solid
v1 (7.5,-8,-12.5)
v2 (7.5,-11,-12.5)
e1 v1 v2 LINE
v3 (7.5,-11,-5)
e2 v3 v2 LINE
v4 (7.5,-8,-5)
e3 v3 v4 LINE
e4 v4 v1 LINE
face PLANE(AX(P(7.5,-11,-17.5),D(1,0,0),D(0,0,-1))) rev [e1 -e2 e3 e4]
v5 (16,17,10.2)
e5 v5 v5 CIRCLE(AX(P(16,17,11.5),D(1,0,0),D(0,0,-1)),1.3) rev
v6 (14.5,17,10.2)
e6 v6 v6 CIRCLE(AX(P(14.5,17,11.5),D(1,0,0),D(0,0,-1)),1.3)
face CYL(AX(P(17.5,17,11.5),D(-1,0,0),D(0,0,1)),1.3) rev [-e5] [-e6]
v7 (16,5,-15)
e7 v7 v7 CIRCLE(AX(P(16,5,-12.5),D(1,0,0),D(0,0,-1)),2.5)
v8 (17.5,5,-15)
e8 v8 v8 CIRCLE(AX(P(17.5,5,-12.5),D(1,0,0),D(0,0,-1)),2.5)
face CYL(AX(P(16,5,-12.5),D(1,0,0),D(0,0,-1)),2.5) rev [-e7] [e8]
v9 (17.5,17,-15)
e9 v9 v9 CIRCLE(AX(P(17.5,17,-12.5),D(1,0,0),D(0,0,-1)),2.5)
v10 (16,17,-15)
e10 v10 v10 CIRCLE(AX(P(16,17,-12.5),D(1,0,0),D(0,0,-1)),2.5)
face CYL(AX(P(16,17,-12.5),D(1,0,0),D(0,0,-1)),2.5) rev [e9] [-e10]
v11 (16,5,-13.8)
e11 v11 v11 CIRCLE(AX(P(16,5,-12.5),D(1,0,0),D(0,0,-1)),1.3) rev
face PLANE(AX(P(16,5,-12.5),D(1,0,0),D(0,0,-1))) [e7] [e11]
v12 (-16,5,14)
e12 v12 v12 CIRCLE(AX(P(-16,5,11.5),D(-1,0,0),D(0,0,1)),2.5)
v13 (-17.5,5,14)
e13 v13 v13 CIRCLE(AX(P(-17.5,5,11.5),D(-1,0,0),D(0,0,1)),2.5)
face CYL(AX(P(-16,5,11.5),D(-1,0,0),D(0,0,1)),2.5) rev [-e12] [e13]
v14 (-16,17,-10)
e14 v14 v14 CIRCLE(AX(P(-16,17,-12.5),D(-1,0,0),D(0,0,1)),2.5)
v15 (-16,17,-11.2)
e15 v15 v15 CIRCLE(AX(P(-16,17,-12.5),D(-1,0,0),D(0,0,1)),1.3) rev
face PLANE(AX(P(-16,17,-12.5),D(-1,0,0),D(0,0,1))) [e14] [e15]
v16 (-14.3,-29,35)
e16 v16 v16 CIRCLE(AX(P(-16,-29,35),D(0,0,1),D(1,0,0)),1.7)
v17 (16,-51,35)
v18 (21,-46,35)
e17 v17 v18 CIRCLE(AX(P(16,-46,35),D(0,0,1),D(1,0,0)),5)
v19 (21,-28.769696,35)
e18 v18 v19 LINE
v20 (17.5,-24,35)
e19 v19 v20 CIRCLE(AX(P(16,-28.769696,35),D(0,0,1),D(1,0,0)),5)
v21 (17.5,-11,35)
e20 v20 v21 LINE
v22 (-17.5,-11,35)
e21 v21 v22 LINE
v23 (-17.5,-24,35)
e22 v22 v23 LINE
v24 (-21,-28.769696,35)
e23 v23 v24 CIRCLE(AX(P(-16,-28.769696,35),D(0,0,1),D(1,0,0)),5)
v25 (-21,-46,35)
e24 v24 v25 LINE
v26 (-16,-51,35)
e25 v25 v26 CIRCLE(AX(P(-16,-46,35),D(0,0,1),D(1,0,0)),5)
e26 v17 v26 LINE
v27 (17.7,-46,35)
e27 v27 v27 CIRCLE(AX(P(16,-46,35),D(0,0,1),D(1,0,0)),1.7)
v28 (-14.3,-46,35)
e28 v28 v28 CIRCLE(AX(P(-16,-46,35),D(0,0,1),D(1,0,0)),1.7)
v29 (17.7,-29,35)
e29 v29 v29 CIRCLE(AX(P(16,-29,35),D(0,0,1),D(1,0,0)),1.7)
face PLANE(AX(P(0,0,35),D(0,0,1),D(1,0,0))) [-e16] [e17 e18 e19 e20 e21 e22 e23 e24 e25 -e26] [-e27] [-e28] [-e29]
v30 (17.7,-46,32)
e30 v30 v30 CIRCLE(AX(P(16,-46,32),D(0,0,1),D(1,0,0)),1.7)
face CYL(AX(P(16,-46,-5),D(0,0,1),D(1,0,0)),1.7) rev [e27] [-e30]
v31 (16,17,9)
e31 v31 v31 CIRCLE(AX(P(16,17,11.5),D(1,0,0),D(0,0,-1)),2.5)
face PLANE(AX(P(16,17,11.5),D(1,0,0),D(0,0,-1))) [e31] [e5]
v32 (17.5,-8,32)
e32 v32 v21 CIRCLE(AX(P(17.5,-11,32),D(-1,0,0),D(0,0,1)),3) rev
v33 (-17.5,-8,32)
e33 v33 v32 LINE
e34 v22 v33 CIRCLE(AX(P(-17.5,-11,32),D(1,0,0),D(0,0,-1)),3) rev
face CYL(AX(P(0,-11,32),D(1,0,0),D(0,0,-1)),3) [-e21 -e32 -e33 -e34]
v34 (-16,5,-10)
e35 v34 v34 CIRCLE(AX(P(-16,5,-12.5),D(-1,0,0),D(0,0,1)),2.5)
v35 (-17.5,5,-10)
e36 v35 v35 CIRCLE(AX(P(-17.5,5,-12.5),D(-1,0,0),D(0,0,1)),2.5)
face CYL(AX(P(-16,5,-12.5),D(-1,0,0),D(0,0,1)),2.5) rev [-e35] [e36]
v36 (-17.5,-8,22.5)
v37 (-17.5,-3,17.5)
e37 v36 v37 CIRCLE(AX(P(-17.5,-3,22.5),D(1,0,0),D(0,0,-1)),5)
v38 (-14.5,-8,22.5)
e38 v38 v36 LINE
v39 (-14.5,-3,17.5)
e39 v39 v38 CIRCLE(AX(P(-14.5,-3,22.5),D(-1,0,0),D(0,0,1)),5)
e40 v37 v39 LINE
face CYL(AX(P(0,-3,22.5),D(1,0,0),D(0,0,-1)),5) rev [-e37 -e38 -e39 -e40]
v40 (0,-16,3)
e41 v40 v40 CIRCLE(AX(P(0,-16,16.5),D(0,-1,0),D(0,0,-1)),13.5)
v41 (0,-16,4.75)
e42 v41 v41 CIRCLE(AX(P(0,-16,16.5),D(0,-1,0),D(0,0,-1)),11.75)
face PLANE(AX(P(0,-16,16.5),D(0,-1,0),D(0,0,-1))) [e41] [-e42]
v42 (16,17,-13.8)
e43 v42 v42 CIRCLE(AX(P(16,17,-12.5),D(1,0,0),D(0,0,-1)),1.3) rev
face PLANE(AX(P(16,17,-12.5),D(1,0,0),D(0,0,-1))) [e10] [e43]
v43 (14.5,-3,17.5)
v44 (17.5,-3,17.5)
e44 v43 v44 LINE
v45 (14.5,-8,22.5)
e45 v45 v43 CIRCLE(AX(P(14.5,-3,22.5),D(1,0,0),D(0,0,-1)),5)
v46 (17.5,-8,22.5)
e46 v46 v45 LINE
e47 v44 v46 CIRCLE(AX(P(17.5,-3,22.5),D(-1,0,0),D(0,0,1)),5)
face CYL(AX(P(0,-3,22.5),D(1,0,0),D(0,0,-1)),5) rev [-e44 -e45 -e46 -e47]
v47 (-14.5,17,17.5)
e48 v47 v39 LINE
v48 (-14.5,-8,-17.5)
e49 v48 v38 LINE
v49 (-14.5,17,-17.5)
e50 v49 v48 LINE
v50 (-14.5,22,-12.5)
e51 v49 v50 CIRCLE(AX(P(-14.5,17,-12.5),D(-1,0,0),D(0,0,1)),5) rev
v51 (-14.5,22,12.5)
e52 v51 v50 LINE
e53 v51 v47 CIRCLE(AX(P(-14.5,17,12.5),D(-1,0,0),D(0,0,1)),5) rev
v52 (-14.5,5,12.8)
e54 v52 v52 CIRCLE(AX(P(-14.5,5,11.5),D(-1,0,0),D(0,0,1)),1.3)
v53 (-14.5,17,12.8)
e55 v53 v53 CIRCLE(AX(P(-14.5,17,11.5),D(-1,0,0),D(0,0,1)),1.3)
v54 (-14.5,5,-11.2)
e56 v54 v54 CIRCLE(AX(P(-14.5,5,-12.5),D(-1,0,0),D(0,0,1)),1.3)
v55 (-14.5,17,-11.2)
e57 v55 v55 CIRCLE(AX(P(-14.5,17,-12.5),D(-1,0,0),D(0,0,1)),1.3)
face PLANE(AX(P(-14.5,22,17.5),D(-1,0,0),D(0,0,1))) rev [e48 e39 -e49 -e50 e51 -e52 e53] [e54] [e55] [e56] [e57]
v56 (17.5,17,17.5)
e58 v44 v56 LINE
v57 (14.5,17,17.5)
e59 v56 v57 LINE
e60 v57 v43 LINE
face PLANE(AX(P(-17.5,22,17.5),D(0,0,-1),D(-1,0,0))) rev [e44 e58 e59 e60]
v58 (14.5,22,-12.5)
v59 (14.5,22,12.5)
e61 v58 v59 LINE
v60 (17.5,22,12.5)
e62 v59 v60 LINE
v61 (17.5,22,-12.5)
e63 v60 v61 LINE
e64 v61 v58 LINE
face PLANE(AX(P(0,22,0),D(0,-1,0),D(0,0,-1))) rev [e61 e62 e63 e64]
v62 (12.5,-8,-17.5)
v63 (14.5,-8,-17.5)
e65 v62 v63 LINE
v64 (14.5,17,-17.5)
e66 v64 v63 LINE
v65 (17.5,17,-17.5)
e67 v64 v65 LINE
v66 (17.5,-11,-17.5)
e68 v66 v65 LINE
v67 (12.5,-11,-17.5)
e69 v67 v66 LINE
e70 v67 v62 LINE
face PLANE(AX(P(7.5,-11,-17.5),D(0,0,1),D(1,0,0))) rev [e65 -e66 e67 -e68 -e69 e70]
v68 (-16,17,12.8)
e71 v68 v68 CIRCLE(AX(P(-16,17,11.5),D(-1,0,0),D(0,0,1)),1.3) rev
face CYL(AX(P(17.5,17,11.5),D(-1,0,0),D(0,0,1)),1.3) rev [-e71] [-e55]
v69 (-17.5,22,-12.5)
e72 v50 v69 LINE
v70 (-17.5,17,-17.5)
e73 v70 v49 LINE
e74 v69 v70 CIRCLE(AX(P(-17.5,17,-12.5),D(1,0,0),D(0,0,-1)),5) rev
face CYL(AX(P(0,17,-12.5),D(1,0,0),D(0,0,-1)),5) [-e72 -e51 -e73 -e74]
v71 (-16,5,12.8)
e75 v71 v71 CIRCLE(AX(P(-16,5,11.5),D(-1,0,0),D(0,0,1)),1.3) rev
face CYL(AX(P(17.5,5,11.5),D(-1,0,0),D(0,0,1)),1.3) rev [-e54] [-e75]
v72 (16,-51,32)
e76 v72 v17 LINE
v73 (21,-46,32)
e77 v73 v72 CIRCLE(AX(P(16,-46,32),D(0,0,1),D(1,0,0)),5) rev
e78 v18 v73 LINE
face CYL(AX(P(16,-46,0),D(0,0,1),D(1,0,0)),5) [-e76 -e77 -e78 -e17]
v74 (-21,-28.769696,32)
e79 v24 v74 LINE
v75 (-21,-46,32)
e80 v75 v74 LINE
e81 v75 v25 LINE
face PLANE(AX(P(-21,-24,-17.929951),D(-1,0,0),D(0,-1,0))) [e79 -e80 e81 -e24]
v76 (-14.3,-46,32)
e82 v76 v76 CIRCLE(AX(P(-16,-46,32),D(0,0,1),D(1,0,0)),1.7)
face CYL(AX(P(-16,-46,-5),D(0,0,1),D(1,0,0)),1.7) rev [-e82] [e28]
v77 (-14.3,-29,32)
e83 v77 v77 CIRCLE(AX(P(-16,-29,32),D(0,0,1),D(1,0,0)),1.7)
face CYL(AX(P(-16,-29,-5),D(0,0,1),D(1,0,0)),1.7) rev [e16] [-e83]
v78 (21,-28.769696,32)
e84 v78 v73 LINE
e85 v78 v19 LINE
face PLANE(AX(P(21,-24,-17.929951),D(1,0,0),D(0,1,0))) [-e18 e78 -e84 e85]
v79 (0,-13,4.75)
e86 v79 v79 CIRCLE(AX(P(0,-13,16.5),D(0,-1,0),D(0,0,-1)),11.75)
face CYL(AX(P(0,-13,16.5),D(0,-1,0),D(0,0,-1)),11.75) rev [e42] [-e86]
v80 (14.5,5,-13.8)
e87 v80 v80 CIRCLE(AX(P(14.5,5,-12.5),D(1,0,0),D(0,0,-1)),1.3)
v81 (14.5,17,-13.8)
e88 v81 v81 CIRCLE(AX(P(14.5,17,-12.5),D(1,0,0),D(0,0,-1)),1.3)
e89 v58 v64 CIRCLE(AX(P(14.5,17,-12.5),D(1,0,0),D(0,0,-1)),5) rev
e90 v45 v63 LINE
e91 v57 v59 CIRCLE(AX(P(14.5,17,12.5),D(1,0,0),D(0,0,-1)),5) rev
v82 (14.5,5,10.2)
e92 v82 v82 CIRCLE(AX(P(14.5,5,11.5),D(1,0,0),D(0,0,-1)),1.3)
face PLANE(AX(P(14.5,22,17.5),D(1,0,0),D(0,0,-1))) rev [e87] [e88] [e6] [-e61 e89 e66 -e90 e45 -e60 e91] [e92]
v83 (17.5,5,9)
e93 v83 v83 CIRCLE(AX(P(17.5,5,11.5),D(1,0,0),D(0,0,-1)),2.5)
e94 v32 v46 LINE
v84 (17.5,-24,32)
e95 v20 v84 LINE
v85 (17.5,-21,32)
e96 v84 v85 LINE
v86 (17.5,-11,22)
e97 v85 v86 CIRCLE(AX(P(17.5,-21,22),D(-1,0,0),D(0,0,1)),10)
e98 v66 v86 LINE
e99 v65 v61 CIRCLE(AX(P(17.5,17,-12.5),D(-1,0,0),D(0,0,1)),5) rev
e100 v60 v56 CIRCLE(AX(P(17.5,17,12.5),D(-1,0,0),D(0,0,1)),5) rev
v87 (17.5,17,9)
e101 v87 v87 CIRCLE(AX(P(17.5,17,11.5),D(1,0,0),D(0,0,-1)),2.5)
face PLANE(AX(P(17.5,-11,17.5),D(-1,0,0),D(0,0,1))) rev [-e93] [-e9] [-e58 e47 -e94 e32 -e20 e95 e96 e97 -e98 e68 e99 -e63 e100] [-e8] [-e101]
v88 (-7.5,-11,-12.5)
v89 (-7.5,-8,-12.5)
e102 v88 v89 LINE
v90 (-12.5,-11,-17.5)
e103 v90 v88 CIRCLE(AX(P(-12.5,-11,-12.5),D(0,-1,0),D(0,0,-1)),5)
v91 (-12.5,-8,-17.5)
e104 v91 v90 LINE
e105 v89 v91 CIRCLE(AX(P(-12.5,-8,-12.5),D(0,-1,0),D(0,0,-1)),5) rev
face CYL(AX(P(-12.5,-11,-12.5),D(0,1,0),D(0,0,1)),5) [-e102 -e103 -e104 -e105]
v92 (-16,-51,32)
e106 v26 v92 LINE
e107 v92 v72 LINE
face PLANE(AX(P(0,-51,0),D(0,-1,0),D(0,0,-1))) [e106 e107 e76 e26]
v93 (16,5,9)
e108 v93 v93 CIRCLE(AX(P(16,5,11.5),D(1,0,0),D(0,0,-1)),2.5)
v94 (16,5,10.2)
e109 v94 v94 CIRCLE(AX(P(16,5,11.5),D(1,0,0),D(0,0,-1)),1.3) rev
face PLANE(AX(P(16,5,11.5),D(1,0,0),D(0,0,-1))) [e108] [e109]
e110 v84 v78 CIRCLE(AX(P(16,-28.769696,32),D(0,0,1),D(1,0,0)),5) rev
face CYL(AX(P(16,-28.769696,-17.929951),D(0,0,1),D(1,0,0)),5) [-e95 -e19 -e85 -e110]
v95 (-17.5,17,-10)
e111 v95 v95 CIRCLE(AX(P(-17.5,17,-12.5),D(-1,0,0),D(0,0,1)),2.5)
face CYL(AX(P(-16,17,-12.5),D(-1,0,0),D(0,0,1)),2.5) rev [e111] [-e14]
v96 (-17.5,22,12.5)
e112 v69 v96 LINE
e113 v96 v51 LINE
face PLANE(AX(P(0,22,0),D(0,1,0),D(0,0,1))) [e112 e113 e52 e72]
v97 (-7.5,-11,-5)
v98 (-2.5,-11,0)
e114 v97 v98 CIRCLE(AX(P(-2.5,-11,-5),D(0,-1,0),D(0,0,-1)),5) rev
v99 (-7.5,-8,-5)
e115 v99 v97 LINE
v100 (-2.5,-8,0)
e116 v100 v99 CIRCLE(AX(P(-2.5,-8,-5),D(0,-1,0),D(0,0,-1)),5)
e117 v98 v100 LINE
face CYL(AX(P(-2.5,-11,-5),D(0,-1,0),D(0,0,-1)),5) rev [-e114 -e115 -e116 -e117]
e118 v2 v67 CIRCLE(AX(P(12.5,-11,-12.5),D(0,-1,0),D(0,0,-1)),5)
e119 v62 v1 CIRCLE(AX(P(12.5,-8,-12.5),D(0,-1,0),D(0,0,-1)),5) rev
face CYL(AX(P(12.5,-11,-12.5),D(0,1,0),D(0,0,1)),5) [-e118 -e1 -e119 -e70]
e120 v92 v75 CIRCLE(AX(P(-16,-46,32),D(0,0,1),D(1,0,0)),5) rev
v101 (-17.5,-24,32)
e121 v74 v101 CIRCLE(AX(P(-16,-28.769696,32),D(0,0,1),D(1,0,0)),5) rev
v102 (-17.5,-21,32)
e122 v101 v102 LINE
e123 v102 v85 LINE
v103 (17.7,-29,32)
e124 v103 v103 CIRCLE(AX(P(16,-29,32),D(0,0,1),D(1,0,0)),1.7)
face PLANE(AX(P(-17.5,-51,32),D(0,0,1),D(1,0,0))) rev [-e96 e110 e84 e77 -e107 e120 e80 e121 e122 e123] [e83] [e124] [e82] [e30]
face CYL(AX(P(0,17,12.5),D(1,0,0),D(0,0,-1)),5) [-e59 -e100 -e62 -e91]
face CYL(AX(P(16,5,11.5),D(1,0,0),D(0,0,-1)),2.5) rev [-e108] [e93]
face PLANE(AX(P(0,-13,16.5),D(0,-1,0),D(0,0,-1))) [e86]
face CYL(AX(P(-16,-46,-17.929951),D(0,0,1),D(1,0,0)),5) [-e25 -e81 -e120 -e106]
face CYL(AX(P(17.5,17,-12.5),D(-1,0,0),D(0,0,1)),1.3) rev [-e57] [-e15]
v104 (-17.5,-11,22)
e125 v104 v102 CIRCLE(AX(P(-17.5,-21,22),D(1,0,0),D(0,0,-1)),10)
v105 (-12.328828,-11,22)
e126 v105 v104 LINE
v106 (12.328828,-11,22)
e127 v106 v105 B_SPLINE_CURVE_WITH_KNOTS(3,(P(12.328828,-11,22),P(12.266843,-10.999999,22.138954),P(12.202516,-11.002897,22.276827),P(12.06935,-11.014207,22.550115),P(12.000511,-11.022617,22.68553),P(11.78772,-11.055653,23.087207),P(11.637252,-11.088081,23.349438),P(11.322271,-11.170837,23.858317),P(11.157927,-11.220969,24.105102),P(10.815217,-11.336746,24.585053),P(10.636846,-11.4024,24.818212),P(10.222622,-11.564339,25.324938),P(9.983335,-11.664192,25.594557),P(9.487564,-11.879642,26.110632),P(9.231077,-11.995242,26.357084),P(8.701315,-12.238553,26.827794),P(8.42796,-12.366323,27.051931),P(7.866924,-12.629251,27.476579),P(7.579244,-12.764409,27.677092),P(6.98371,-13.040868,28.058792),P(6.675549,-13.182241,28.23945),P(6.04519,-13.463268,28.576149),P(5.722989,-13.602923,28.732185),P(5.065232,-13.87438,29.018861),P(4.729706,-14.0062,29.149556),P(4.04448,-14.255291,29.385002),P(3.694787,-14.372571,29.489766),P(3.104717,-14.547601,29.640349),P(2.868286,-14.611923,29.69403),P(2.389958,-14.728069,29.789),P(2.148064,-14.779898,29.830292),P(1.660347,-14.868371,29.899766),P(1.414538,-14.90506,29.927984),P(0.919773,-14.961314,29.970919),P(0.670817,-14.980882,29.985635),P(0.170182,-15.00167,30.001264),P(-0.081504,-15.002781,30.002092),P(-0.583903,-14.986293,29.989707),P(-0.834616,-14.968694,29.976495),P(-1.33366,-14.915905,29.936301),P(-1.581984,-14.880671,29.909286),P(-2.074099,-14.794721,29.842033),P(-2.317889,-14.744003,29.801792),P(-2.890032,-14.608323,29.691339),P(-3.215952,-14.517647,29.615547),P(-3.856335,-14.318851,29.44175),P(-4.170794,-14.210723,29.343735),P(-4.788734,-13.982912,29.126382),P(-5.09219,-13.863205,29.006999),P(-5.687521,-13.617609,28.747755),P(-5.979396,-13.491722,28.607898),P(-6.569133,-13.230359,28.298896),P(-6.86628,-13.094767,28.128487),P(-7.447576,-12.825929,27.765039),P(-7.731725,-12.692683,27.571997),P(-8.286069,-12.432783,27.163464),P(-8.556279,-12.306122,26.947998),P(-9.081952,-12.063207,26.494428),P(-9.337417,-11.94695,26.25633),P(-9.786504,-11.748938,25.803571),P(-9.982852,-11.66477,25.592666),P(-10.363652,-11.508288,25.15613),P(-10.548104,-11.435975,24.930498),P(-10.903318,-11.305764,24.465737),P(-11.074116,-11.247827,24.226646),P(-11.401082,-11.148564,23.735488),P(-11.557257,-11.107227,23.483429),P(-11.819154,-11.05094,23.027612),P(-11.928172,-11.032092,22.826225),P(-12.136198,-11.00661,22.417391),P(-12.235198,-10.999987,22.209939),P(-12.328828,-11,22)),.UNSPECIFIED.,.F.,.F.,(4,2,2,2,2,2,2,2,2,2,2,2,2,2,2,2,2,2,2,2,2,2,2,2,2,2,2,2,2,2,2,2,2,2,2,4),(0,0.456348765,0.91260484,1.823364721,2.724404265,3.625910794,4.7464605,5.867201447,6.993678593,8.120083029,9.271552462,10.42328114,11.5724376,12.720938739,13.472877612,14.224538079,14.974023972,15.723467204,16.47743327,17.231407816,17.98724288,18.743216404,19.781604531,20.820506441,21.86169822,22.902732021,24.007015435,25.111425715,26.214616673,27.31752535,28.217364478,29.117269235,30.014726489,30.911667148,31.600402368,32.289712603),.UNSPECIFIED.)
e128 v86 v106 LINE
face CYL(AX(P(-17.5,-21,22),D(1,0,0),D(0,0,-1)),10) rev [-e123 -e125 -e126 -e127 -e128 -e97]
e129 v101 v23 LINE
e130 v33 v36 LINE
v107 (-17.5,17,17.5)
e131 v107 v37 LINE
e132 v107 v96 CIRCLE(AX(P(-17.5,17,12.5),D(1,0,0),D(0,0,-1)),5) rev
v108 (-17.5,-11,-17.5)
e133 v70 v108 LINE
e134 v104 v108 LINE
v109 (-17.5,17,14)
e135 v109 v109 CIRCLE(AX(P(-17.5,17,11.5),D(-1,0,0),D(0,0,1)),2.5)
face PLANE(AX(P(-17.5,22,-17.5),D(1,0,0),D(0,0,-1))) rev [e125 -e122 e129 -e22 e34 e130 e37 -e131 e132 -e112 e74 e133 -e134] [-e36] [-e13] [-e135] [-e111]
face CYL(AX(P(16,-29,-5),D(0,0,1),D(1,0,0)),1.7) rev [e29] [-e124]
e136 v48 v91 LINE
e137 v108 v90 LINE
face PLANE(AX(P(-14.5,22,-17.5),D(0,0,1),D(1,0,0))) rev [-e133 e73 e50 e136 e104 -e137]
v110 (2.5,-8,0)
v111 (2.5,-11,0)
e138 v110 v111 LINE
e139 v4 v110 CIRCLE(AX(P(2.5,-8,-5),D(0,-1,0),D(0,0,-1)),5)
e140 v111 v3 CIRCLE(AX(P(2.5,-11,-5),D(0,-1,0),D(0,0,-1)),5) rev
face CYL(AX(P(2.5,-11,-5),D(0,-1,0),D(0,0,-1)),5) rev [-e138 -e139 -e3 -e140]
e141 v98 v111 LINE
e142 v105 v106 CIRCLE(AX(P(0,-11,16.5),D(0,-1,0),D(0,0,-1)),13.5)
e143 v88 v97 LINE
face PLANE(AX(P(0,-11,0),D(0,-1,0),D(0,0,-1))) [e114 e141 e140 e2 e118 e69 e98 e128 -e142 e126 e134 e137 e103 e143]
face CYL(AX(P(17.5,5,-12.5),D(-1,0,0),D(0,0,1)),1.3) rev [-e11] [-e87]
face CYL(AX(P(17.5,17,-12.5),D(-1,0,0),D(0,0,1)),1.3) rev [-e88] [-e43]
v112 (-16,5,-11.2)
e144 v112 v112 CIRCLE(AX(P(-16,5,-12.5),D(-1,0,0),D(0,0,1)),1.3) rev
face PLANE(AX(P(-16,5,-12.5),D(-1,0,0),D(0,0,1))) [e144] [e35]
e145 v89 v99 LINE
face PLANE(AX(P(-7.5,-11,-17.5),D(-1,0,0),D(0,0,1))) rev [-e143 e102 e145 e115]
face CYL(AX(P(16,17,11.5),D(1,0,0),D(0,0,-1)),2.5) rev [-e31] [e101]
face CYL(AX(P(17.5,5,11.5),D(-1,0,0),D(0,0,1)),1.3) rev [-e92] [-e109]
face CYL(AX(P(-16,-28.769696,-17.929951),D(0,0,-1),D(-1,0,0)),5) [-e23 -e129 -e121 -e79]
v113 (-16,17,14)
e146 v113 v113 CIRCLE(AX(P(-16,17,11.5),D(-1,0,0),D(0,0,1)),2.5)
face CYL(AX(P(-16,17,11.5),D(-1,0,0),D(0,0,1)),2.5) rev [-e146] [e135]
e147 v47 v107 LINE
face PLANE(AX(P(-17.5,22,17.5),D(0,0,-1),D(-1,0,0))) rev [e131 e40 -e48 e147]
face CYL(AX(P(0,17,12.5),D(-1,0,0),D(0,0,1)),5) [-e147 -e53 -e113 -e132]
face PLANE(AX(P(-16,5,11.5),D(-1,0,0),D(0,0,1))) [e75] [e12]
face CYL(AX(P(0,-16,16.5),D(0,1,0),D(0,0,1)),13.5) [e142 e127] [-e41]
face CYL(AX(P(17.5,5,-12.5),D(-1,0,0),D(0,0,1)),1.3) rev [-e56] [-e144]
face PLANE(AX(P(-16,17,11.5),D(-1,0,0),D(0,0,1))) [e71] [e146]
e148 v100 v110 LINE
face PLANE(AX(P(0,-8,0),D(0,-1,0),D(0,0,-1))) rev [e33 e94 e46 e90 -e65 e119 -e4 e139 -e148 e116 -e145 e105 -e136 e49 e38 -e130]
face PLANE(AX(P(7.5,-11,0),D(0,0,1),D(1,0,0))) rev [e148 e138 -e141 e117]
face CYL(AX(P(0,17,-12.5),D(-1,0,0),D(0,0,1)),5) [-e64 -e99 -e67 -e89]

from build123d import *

# Parameters (mm, degrees)
SKETCH1_W             = 3
SKETCH1_H             = 35
BOSS_EXTRUDE1_DEPTH   = 22
BOSS_EXTRUDE1_2_DEPTH = 22
SKETCH2_R             = 1.3
CUT_EXTRUDE1_DEPTH    = 45.891535951
SKETCH4_W             = 3
SKETCH4_H             = 35
BOSS_EXTRUDE3_DEPTH   = 8
BOSS_EXTRUDE4_DEPTH   = 3
SKETCH7_R             = 13.5
BOSS_EXTRUDE5_DEPTH   = 5
SKETCH8_R             = 11.75
CUT_EXTRUDE2_DEPTH    = 3
SKETCH9_R             = 2.5
CUT_EXTRUDE3_DEPTH    = 1.5
CUT_EXTRUDE4_START    = -1.5
SKETCH10_R            = 2.5
CUT_EXTRUDE4_DEPTH    = 1.5
SKETCH11_W            = 35
SKETCH11_H            = 3
BOSS_EXTRUDE6_DEPTH   = 17.5
SKETCH13_W            = 35
SKETCH13_H            = 3
BOSS_EXTRUDE7_DEPTH   = 40
SKETCH14_W            = 42
SKETCH14_H            = 27
BOSS_EXTRUDE8_DEPTH   = 3
SKETCH15_R            = 1.7
CUT_EXTRUDE5_DEPTH    = 40
FILLET1_R             = 10
FILLET2_R             = 5
FILLET3_R             = 3


with BuildPart() as part:
    # Sketch1 → Boss-Extrude1 (new body)
    with BuildSketch(Plane(origin=(0, 0, 0), x_dir=(1, 0, 0), z_dir=(0, 1, 0))):
        with Locations((-16, 0)):
            Rectangle(SKETCH1_W, SKETCH1_H)
    extrude(amount=BOSS_EXTRUDE1_DEPTH)


with BuildPart() as body_2:
    # Sketch1 → Boss-Extrude1 2 (new body)
    with BuildSketch(Plane(origin=(0, 0, 0), x_dir=(1, 0, 0), z_dir=(0, 1, 0))):
        with Locations((16, 0)):
            Rectangle(SKETCH1_W, SKETCH1_H)
    extrude(amount=BOSS_EXTRUDE1_2_DEPTH)


with BuildPart() as cut_extrude1_tool:
    # Sketch2 → Cut-Extrude1 (new, through all)
    with BuildSketch(Plane.ZY.offset(17.5)):
        with Locations((-12.5, 17)):
            Circle(SKETCH2_R)
        with Locations((11.5, 17)):
            Circle(SKETCH2_R)
        with Locations((11.5, 5)):
            Circle(SKETCH2_R)
        with Locations((-12.5, 5)):
            Circle(SKETCH2_R)
    extrude(amount=-CUT_EXTRUDE1_DEPTH)


with BuildPart() as part_1:
    add(part.part)

    # Cut-Extrude1: cut by cut_extrude1_tool
    add(cut_extrude1_tool.part, mode=Mode.SUBTRACT)



with BuildPart() as body_2_1:
    add(body_2.part)

    # Cut-Extrude1: cut by cut_extrude1_tool
    add(cut_extrude1_tool.part, mode=Mode.SUBTRACT)


with BuildPart() as part_2:
    add(part_1.part)

    add(body_2_1.part)  # Boss-Extrude3 merges body 2
    # Sketch4 → Boss-Extrude3 (add)
    with BuildSketch(Plane.XZ):
        with Locations((-16, 0)):
            Rectangle(SKETCH4_W, SKETCH4_H)
        with Locations((16, 0)):
            Rectangle(SKETCH4_W, SKETCH4_H)
    extrude(amount=BOSS_EXTRUDE3_DEPTH)

    # Sketch5 → Boss-Extrude4 (add)
    with BuildSketch(Plane.XZ.offset(8)):
        Polygon((-17.5, 17.5), (17.5, 17.5), (17.5, -17.5), (7.5, -17.5), (7.5, 0), (-7.5, 0), (-7.5, -17.5), (-17.5, -17.5), align=None)
    extrude(amount=BOSS_EXTRUDE4_DEPTH)

    # Sketch7 → Boss-Extrude5 (add)
    with BuildSketch(Plane.XZ.offset(11)):
        with Locations(Location((0, 16.5, 0), (0, 0, 175.751977333))):
            Circle(SKETCH7_R)
    extrude(amount=BOSS_EXTRUDE5_DEPTH)

    # Sketch8 → Cut-Extrude2 (cut)
    with BuildSketch(Plane(origin=(0, -16, 0), x_dir=(-1, 0, 0), z_dir=(0, -1, 0))):
        with Locations(Location((0, -16.5, 0), (0, 0, 90))):
            Circle(SKETCH8_R)
    extrude(amount=-CUT_EXTRUDE2_DEPTH, mode=Mode.SUBTRACT)

    # Sketch9 → Cut-Extrude3 (cut)
    with BuildSketch(Plane.ZY.offset(17.5)):
        with Locations((-12.5, 17)):
            Circle(SKETCH9_R)
        with Locations((11.5, 17)):
            Circle(SKETCH9_R)
        with Locations((11.5, 5)):
            Circle(SKETCH9_R)
        with Locations((-12.5, 5)):
            Circle(SKETCH9_R)
    extrude(amount=-CUT_EXTRUDE3_DEPTH, mode=Mode.SUBTRACT)

    # Sketch10 → Cut-Extrude4 (cut)
    with BuildSketch(Plane(origin=(17.5, 0, 0), x_dir=(0, 0, -1), z_dir=(1, 0, 0)).offset(CUT_EXTRUDE4_START)):
        with Locations(Location((-11.5, 17, 0), (0, 0, 180))):
            Circle(SKETCH10_R)
        with Locations(Location((12.5, 17, 0), (0, 0, 180))):
            Circle(SKETCH10_R)
        with Locations(Location((12.5, 5, 0), (0, 0, 180))):
            Circle(SKETCH10_R)
        with Locations(Location((-11.5, 5, 0), (0, 0, 180))):
            Circle(SKETCH10_R)
    extrude(amount=CUT_EXTRUDE4_DEPTH, mode=Mode.SUBTRACT)

    # Sketch11 → Boss-Extrude6 (add)
    with BuildSketch(Plane.XY.offset(17.5)):
        with Locations((0, -9.5)):
            Rectangle(SKETCH11_W, SKETCH11_H)
    extrude(amount=BOSS_EXTRUDE6_DEPTH)

    # Sketch13 → Boss-Extrude7 (add)
    with BuildSketch(Plane.XZ.offset(11)):
        with Locations((0, 33.5)):
            Rectangle(SKETCH13_W, SKETCH13_H)
    extrude(amount=BOSS_EXTRUDE7_DEPTH)

    # Sketch14 → Boss-Extrude8 (add)
    with BuildSketch(Plane.XY.offset(35)):
        with Locations((0, -37.5)):
            Rectangle(SKETCH14_W, SKETCH14_H)
    extrude(amount=-BOSS_EXTRUDE8_DEPTH)

    # Sketch15 → Cut-Extrude5 (cut)
    with BuildSketch(Plane.XY.offset(35)):
        with Locations((-16, -29)):
            Circle(SKETCH15_R)
        with Locations((16, -29)):
            Circle(SKETCH15_R)
        with Locations((16, -46)):
            Circle(SKETCH15_R)
        with Locations((-16, -46)):
            Circle(SKETCH15_R)
    extrude(amount=-CUT_EXTRUDE5_DEPTH, mode=Mode.SUBTRACT)

    # Fillet1
    # the kernel refuses this fillet: 10 mm, written as the material it adds along each edge
    with BuildSketch(Plane(origin=(17.5, -11, 32), x_dir=(0, 0, -1), z_dir=(-1, 0, 0))) as fillet1_piece_1_section:
        with BuildLine():
            CenterArc((FILLET1_R, FILLET1_R), FILLET1_R, 180, 90)
            Line((0, FILLET1_R), (0, 0))
            Line((0, 0), (FILLET1_R, 0))
        make_face()
    fillet1_piece_1 = extrude(amount=35, mode=Mode.PRIVATE)
    fillet1_piece_1 = fillet1_piece_1 - Plane(origin=(0, -11, 16.5), x_dir=(0, 0, -1), z_dir=(0, -1, 0)) * Cylinder(11.75, 110, mode=Mode.PRIVATE)
    add(fillet1_piece_1)

    # Fillet2
    # the kernel refuses this fillet: 5 mm, written as the material it adds along each edge
    with BuildSketch(Plane(origin=(14.5, -8, 17.5), x_dir=(0, 0, 1), z_dir=(1, 0, 0)), Plane(origin=(-17.5, -8, 17.5), x_dir=(0, 0, 1), z_dir=(1, 0, 0))) as fillet2_piece_1:
        with BuildLine():
            CenterArc((FILLET2_R, -FILLET2_R), FILLET2_R, 90, 90)
            Line((0, -FILLET2_R), (0, 0))
            Line((0, 0), (FILLET2_R, 0))
        make_face()
    extrude(amount=3)
    with BuildSketch(Plane(origin=(-7.5, -8, 0), x_dir=(0, 0, -1), z_dir=(0, -1, 0)), Plane(origin=(7.5, -8, 0), x_dir=(-1, 0, 0), z_dir=(0, -1, 0))) as fillet2_piece_2:
        with BuildLine():
            CenterArc((FILLET2_R, FILLET2_R), FILLET2_R, 180, 90)
            Line((0, FILLET2_R), (0, 0))
            Line((0, 0), (FILLET2_R, 0))
        make_face()
    extrude(amount=3)
    # the kernel refuses this fillet: 5 mm, written as the material it takes off along each edge
    with BuildSketch(Plane(origin=(-30, 22, 17.5), x_dir=(0, 0, -1), z_dir=(1, 0, 0)), Plane(origin=(21, -51, 47.5), x_dir=(0, 1, 0), z_dir=(0, 0, -1)), Plane(origin=(-21, -51, 47.5), x_dir=(1, 0, 0), z_dir=(0, 0, -1)), Plane(origin=(-7.5, 4.5, -17.5), x_dir=(-1, 0, 0), z_dir=(0, -1, 0)), Plane(origin=(7.5, 4.5, -17.5), x_dir=(0, 0, 1), z_dir=(0, -1, 0)), Plane(origin=(2, 22, -17.5), x_dir=(0, -1, 0), z_dir=(1, 0, 0))) as fillet2_2_piece_1:
        with BuildLine():
            CenterArc((FILLET2_R, -FILLET2_R), FILLET2_R, 90, 90)
            Line((0, -FILLET2_R), (0, 0))
            Line((0, 0), (FILLET2_R, 0))
        make_face()
    extrude(amount=28, mode=Mode.SUBTRACT)
    with BuildSketch(Plane(origin=(30, 22, 17.5), x_dir=(0, 0, -1), z_dir=(-1, 0, 0)), Plane(origin=(-2, 22, -17.5), x_dir=(0, -1, 0), z_dir=(-1, 0, 0))) as fillet2_2_piece_2:
        with BuildLine():
            CenterArc((FILLET2_R, FILLET2_R), FILLET2_R, 180, 90)
            Line((0, FILLET2_R), (0, 0))
            Line((0, 0), (FILLET2_R, 0))
        make_face()
    extrude(amount=28, mode=Mode.SUBTRACT)
    with BuildSketch(Plane(origin=(-21, -24, 46.924240018), x_dir=(0, -1, 0), z_dir=(0, 0, -1))) as fillet2_2_piece_3:
        with BuildLine():
            CenterArc((4.769696007, -5), FILLET2_R, 90, 72.542396876)
            Line((0, -3.5), (0, 0))
            Line((0, 0), (4.769696007, 0))
        make_face()
    extrude(amount=26.848480035, mode=Mode.SUBTRACT)
    with BuildSketch(Plane(origin=(21, -24, 46.924240018), x_dir=(-1, 0, 0), z_dir=(0, 0, -1))) as fillet2_2_piece_4:
        with BuildLine():
            CenterArc((5, -4.769696007), FILLET2_R, 107.457603124, 72.542396876)
            Line((0, -4.769696007), (0, 0))
            Line((0, 0), (3.5, 0))
        make_face()
    extrude(amount=26.848480035, mode=Mode.SUBTRACT)

    # Fillet3
    fillet3_edges = [part_2.edges().sort_by_distance(p)[0] for p in [
        (0, -8, 35),
    ]]
    fillet(fillet3_edges, radius=FILLET3_R)


solid = part_2.part
